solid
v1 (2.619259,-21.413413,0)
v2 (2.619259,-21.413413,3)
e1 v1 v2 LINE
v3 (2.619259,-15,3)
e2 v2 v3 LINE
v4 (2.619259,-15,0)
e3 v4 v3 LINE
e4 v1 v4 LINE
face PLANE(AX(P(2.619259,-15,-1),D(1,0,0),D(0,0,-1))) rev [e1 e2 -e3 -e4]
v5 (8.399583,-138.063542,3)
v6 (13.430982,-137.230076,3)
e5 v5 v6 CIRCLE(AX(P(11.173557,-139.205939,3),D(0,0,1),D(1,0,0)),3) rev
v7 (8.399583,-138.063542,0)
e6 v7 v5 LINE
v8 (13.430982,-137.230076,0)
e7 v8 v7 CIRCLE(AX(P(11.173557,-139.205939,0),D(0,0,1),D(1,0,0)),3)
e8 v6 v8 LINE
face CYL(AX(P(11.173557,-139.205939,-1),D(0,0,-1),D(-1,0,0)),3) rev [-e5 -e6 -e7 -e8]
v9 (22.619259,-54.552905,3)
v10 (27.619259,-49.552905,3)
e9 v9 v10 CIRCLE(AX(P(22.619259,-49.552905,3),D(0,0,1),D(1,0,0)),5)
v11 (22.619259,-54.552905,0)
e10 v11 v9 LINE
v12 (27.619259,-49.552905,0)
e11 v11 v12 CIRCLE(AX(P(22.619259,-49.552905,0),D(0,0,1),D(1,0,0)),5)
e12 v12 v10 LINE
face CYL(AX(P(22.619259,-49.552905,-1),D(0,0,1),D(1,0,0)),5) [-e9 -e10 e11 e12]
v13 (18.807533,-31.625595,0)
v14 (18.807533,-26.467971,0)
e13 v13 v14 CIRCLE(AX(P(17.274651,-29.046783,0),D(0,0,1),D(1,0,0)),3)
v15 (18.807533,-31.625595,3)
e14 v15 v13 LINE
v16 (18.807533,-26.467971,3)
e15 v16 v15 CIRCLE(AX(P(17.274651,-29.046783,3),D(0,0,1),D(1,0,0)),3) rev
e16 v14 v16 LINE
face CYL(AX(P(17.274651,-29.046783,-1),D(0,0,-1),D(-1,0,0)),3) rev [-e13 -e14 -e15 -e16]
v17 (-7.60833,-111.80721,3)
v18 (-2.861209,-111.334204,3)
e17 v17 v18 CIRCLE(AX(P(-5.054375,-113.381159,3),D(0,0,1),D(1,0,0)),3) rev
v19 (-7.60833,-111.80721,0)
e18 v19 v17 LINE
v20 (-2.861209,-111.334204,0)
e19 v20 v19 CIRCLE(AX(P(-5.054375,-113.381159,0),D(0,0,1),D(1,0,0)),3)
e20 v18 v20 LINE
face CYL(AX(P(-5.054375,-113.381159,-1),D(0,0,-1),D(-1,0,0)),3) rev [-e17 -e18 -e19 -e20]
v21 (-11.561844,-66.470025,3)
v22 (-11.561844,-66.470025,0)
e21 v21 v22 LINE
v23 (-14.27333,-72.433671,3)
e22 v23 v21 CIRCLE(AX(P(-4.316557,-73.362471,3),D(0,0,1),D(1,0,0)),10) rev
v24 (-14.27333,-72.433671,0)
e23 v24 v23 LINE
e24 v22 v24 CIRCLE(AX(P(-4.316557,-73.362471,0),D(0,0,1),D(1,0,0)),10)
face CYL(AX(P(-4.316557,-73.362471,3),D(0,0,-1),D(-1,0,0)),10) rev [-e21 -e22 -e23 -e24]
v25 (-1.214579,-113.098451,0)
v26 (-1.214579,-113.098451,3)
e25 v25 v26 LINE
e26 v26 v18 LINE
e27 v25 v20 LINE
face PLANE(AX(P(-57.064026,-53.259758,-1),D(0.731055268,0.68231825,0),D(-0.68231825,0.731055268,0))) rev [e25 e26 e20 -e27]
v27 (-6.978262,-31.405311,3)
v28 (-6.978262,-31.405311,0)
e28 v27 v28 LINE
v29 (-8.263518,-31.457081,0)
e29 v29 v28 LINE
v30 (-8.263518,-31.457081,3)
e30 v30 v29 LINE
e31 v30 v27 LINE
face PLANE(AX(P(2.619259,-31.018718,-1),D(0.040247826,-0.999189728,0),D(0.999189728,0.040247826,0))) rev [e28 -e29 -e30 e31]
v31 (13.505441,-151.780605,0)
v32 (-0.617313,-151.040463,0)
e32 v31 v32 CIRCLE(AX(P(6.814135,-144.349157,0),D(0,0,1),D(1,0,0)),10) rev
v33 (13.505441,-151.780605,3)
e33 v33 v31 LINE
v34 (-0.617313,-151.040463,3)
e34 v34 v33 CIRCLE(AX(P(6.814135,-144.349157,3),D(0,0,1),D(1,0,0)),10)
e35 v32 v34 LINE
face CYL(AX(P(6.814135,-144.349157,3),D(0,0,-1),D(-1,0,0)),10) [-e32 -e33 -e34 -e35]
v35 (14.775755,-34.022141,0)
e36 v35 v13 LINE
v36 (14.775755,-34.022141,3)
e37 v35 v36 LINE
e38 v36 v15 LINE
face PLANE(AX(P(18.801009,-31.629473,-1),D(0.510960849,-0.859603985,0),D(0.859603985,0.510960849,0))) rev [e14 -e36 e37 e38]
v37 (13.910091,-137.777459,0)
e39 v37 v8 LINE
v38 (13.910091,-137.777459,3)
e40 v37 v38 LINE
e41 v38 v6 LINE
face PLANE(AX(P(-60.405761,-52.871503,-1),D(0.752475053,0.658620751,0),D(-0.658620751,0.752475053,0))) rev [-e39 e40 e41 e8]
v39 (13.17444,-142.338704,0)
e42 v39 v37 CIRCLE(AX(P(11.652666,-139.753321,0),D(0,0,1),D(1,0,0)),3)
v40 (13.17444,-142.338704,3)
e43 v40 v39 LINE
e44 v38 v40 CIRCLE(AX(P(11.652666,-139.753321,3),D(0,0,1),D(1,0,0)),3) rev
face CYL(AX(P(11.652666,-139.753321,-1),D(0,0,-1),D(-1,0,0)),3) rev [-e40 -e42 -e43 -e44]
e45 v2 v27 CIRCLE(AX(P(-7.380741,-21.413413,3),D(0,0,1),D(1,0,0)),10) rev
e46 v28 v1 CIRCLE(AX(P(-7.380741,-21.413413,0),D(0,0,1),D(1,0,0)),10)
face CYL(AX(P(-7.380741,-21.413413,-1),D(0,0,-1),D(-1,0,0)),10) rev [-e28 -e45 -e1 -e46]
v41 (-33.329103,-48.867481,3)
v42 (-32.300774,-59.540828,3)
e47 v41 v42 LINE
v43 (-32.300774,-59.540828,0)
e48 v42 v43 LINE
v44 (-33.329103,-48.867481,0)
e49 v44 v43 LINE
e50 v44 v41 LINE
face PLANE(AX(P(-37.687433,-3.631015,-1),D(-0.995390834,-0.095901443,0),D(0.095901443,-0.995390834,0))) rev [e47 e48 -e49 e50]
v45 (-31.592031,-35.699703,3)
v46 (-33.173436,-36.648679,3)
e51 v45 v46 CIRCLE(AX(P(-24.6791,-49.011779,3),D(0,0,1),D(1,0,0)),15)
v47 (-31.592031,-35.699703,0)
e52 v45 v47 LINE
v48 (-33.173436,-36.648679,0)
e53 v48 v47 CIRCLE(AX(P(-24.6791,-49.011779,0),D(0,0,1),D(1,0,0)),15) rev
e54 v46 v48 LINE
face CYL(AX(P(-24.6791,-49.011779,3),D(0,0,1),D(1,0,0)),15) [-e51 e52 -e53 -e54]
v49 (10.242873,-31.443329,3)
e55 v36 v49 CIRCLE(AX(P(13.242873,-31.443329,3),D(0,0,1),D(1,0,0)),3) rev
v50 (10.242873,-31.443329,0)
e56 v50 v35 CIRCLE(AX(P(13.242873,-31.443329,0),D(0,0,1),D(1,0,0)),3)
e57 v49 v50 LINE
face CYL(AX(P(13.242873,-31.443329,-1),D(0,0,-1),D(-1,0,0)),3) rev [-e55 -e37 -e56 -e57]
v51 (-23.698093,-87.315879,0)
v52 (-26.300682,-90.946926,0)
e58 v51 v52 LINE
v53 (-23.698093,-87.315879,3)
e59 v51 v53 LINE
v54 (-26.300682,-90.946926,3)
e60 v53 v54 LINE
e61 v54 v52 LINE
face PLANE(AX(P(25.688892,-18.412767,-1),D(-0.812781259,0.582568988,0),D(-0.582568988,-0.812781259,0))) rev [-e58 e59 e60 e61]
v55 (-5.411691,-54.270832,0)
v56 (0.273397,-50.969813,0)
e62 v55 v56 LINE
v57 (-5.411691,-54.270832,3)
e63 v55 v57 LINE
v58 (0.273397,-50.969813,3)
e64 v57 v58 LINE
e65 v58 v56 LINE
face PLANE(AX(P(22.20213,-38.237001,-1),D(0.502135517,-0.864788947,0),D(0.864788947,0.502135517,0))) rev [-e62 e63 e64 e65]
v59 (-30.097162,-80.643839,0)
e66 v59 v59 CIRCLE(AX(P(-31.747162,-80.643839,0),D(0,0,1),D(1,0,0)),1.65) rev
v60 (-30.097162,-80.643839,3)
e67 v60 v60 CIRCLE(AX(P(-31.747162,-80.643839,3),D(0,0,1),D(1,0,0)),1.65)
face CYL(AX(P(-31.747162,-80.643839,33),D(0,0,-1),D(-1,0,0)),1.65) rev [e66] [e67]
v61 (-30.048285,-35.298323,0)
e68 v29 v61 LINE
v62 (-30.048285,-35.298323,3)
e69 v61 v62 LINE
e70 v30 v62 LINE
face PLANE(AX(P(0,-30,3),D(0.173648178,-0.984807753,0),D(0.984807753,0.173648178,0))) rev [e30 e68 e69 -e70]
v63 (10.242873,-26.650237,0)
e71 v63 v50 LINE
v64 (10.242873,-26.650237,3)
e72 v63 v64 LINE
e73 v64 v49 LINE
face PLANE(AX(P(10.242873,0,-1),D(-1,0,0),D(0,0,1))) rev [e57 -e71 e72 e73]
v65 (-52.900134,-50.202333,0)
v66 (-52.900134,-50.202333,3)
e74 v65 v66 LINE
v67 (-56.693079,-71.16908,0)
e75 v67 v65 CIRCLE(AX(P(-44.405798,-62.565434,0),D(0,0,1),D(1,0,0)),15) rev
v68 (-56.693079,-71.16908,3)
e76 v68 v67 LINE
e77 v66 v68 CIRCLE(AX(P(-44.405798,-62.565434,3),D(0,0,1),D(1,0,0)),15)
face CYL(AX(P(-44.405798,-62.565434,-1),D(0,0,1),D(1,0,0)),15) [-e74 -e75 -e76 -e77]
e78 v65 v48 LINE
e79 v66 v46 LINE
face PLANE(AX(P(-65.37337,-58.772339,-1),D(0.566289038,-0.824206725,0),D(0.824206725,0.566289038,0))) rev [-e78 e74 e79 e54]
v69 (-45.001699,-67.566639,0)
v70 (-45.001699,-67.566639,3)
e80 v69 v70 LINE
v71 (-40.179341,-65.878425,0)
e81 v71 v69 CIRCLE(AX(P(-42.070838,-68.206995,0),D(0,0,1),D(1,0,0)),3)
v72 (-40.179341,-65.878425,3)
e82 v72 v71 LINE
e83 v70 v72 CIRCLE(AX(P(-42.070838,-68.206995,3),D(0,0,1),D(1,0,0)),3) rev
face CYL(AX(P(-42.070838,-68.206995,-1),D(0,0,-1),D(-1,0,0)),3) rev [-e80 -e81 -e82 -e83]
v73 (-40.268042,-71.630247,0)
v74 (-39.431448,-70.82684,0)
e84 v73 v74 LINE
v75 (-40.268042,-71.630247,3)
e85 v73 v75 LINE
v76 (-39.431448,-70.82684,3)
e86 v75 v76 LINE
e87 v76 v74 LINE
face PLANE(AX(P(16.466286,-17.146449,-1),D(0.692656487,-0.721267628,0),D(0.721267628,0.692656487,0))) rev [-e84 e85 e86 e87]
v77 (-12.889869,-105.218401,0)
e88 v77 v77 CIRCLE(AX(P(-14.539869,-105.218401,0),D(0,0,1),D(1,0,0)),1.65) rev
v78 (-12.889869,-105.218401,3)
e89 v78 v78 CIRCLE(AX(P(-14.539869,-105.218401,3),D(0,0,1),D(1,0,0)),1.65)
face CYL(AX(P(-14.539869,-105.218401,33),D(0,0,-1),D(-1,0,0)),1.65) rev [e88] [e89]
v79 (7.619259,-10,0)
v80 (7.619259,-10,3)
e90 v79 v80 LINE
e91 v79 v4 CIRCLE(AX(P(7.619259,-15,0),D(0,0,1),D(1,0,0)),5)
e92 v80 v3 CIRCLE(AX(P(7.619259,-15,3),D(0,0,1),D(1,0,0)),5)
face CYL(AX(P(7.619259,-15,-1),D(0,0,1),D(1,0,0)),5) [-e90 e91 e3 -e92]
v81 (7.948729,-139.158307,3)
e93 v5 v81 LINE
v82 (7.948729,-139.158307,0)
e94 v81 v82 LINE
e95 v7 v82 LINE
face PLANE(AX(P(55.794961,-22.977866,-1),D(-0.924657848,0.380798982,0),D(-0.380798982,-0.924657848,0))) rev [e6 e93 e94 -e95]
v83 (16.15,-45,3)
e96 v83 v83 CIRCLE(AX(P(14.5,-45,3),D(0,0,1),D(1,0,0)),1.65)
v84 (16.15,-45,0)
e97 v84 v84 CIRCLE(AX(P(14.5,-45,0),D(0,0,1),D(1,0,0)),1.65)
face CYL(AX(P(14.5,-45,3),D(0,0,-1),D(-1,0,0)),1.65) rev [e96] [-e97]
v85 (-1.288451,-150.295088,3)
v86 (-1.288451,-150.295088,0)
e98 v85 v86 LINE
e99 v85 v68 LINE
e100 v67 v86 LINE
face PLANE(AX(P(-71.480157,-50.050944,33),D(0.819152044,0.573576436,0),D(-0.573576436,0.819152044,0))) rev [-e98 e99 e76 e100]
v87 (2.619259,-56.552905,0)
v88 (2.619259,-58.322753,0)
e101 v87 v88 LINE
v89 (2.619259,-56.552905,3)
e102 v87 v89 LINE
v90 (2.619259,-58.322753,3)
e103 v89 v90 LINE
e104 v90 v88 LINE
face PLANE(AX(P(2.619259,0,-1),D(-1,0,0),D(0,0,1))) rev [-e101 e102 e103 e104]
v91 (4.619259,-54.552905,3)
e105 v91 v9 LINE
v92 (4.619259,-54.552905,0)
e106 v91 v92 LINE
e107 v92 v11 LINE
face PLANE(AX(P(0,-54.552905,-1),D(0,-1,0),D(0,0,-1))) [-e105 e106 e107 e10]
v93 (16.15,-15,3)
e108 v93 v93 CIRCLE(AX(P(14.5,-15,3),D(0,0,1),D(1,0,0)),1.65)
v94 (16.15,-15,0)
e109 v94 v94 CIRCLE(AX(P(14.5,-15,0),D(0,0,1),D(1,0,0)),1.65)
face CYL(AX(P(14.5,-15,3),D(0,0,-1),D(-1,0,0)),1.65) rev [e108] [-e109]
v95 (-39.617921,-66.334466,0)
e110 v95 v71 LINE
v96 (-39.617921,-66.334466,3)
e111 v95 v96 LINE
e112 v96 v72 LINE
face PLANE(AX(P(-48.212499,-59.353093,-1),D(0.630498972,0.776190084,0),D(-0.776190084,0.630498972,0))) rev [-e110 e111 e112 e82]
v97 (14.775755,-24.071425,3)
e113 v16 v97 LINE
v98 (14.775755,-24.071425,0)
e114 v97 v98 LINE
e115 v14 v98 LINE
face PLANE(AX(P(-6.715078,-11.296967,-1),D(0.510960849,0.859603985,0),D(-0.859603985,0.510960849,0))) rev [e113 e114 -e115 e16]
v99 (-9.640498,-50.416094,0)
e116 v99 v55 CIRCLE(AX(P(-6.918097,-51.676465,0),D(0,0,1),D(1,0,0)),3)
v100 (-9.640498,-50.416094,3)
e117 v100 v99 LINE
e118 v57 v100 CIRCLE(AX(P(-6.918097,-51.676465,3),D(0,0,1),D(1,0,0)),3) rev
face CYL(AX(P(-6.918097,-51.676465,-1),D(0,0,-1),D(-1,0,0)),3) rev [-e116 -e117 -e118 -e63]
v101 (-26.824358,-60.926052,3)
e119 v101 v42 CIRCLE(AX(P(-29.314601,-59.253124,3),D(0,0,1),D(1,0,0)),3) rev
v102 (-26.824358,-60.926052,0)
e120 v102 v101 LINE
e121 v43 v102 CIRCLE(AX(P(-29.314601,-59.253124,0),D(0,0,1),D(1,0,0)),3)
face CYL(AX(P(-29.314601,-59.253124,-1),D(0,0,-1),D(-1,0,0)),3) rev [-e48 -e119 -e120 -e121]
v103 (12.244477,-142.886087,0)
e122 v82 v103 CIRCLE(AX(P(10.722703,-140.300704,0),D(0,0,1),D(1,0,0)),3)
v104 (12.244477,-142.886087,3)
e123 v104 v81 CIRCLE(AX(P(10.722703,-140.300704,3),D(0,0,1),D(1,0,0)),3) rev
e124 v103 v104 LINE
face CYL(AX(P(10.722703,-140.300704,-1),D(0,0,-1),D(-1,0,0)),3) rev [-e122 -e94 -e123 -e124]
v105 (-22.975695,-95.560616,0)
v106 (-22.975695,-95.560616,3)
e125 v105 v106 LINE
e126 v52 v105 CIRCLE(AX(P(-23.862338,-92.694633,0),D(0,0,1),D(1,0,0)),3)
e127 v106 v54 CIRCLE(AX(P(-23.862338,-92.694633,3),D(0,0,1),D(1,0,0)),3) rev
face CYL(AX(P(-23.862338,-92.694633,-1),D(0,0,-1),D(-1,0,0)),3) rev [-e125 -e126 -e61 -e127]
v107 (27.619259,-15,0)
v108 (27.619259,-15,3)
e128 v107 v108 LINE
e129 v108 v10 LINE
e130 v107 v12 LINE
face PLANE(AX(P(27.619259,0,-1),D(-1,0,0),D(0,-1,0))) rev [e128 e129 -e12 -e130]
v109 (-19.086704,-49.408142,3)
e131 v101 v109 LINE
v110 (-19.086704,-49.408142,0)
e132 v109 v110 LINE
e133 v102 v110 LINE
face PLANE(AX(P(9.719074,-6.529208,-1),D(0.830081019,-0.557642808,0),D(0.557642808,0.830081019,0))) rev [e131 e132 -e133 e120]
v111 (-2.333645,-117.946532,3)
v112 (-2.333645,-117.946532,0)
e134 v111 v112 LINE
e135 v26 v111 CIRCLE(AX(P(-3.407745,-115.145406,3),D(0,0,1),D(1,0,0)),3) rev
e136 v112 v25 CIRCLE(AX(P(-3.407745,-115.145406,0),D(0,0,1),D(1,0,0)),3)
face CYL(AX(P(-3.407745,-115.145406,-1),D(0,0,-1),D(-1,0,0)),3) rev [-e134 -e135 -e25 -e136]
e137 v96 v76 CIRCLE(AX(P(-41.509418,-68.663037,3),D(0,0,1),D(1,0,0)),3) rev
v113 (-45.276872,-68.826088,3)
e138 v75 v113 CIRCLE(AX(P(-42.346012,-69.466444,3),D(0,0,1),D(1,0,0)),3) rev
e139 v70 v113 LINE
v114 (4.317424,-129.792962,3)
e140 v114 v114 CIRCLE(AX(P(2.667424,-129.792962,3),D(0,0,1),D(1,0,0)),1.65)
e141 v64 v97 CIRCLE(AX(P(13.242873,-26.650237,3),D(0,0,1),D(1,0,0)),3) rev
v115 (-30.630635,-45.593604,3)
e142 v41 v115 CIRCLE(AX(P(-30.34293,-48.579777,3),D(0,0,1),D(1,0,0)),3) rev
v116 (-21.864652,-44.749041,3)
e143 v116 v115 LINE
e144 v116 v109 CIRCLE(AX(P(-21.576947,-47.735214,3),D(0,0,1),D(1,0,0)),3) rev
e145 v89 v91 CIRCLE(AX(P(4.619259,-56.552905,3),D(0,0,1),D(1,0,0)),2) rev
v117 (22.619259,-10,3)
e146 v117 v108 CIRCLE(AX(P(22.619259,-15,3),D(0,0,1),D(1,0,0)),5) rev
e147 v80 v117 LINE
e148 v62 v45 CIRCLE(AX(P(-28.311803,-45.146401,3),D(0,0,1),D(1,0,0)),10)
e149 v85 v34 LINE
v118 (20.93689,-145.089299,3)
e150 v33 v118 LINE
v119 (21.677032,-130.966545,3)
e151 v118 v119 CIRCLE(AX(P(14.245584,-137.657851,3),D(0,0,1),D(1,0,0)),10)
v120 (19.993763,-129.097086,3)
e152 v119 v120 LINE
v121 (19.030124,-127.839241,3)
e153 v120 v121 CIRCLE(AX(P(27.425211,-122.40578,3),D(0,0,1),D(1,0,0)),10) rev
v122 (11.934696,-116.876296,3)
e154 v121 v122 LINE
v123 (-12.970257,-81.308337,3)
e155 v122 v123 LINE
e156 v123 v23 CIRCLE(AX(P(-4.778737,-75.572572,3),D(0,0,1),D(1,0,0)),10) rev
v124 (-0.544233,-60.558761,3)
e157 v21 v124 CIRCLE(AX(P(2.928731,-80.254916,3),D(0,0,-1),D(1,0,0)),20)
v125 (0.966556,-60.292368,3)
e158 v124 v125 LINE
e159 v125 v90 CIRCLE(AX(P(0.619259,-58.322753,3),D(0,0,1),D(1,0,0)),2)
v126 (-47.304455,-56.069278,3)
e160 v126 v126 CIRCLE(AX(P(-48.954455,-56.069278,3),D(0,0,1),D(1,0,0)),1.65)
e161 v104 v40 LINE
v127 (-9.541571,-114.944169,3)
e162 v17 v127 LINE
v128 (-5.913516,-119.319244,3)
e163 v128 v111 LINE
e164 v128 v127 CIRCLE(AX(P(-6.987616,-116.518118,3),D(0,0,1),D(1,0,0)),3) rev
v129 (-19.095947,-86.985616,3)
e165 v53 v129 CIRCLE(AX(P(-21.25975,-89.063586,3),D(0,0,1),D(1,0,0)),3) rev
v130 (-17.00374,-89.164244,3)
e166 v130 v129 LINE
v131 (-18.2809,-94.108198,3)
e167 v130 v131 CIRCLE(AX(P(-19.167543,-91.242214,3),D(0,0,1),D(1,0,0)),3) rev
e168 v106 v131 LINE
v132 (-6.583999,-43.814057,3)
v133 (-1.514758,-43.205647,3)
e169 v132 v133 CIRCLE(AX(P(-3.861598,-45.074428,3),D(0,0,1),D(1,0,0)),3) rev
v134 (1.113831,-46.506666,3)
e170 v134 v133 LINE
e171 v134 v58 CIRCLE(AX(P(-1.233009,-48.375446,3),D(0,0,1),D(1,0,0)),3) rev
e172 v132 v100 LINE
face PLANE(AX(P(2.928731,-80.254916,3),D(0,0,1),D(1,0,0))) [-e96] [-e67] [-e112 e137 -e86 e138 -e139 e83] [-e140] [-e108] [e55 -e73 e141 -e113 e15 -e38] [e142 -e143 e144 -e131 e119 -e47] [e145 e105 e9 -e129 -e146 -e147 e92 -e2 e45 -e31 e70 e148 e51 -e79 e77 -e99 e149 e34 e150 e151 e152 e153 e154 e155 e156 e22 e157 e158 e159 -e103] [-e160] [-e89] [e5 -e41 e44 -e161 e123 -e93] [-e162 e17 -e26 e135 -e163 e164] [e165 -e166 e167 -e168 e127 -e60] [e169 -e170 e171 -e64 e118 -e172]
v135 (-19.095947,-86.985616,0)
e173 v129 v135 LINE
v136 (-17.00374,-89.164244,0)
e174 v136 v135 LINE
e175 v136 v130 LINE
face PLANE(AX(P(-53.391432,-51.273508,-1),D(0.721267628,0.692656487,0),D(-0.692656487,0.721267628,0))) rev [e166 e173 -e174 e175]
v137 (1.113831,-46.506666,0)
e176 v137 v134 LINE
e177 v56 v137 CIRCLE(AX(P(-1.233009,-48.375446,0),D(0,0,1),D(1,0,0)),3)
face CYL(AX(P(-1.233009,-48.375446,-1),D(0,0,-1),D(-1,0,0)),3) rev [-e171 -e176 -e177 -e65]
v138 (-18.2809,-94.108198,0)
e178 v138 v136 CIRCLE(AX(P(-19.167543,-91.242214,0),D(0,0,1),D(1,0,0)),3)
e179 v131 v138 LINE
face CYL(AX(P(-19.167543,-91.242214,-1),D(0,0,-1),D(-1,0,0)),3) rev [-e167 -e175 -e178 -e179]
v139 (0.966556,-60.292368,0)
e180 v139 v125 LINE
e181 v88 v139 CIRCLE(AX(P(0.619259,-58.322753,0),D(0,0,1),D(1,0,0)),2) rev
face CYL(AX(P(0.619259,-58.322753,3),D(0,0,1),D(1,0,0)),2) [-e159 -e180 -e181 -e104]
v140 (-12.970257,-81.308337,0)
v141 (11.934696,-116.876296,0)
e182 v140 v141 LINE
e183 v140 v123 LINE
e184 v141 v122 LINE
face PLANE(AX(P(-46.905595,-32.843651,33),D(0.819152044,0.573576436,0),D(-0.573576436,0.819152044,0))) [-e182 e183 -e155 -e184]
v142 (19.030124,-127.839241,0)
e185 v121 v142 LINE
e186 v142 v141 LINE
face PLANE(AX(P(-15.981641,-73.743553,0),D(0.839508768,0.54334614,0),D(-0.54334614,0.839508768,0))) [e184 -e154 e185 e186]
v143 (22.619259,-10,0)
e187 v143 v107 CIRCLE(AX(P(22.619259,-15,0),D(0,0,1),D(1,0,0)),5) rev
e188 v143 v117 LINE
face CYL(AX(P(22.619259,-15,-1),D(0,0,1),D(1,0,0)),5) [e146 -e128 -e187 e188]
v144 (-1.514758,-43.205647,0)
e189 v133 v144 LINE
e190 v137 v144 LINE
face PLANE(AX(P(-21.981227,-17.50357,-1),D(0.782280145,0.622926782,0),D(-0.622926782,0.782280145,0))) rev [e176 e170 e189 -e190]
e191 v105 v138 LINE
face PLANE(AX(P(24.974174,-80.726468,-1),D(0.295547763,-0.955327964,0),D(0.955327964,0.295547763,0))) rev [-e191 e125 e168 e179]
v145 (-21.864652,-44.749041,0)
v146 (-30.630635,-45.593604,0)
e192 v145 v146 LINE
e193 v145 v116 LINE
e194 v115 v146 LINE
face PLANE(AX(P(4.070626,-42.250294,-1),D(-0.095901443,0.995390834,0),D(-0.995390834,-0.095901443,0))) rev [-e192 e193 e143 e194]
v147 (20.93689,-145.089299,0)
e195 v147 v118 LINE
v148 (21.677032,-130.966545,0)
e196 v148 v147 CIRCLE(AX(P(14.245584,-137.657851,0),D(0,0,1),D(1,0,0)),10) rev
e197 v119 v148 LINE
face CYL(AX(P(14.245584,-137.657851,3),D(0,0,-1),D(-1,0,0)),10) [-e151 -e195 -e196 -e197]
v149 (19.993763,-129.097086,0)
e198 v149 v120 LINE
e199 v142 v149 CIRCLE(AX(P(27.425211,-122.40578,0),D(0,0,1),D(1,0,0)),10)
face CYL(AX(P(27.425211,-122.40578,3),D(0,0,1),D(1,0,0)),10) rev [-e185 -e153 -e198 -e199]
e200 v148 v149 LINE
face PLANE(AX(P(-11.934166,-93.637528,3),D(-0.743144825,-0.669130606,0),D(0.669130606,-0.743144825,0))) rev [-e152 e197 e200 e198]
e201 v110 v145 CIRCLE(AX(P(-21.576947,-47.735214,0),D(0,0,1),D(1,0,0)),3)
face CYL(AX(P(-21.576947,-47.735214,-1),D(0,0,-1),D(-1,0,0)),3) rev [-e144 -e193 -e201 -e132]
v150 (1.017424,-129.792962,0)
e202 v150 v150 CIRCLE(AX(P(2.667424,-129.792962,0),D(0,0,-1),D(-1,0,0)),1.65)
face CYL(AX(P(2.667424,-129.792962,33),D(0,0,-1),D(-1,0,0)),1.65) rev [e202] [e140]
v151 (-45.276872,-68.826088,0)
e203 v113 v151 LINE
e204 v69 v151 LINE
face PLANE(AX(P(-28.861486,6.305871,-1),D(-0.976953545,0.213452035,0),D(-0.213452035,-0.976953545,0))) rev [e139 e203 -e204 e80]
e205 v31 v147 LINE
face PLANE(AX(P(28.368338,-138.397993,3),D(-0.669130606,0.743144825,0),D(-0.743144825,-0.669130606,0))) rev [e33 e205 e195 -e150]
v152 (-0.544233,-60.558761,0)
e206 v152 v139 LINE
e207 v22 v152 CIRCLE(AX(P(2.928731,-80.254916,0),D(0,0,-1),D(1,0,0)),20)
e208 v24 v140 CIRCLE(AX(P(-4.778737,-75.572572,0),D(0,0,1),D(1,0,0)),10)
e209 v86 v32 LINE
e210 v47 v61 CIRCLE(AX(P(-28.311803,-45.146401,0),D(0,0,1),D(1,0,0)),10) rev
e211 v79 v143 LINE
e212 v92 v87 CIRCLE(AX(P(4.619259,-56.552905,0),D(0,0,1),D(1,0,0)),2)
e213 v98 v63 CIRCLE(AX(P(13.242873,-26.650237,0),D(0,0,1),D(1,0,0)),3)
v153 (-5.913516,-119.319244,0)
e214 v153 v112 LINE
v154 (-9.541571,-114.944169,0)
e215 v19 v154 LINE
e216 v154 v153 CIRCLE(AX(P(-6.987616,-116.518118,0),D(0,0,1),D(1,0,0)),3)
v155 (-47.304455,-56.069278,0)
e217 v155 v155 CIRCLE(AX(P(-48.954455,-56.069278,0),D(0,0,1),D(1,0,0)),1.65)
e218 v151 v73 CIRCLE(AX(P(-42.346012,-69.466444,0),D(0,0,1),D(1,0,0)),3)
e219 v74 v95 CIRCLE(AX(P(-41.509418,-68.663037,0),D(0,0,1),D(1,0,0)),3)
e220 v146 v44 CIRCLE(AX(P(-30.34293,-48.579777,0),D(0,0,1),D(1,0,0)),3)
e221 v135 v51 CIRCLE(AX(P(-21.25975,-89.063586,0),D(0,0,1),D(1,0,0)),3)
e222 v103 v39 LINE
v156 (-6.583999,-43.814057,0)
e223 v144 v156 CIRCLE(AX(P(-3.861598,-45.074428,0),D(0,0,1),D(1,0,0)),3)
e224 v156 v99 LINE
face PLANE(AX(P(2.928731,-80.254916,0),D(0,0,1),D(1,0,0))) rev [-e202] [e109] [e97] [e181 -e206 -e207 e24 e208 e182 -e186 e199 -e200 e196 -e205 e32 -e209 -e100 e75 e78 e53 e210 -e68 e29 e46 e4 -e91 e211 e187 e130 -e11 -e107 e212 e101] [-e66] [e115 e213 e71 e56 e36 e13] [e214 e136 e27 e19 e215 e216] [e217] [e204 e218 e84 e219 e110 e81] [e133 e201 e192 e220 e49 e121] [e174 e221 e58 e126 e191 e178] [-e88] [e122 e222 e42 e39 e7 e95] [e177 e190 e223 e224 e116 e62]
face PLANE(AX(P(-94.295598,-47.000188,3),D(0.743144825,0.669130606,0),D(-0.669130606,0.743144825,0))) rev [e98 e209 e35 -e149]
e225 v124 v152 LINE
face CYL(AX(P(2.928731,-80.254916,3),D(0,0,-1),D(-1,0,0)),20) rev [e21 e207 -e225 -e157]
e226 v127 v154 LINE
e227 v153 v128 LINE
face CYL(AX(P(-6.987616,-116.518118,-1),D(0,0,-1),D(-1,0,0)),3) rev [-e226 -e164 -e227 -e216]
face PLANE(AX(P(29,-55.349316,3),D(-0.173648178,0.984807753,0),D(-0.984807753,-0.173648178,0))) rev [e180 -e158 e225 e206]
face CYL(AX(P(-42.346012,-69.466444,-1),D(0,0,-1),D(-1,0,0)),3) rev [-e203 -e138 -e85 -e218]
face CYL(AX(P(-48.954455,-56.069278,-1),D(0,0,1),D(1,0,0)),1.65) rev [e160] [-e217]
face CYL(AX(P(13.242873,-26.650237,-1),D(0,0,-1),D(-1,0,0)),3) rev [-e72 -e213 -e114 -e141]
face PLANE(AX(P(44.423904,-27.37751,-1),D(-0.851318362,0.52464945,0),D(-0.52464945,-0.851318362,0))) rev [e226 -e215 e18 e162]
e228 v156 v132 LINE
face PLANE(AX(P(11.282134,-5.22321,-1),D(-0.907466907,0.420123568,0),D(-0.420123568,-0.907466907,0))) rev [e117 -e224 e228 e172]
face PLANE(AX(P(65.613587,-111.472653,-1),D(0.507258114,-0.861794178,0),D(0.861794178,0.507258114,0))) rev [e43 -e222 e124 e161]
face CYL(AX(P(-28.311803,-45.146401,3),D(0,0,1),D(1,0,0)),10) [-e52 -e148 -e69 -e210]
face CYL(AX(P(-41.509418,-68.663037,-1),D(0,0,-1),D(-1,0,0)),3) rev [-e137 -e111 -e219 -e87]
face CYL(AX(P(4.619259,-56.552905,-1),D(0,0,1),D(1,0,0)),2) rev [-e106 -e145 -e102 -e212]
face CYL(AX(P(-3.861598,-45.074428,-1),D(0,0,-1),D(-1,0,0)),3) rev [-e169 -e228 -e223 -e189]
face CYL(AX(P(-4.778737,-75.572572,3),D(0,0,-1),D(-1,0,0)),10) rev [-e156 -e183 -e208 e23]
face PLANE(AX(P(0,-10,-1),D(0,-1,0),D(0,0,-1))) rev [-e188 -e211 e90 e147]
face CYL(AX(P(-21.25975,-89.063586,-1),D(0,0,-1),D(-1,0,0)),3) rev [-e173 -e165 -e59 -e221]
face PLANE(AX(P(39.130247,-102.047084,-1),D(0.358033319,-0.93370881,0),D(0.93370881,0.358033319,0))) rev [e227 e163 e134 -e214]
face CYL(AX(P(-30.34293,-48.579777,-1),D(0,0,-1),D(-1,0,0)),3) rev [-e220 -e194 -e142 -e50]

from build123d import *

# Parameters (mm, degrees)
SKETCH_1_R          = 1.65
EXTRUDE_1_DEPTH     = 3
CUT_EXTRUDE_1_DEPTH = 3
FILLET_1_R          = 10
EXTRUDE_2_DEPTH     = 3
FILLET_2_R          = 10
SKETCH_6_R          = 1.65
CUT_EXTRUDE_2_DEPTH = 33
FILLET_3_R          = 10
FILLET_4_R          = 10
EXTRUDE_3_DEPTH     = 3
SKETCH_8_R          = 1.65
CUT_EXTRUDE_3_DEPTH = 4
CUT_EXTRUDE_5_DEPTH = 4
FILLET_6_R          = 15
FILLET_7_R          = 15
CUT_EXTRUDE_6_DEPTH = 4
FILLET_8_R          = 3
CUT_EXTRUDE_7_DEPTH = 4
FILLET_11_R         = 2
FILLET_12_R         = 10
CUT_EXTRUDE_8_DEPTH = 4
FILLET_13_R         = 10


with BuildPart() as part:
    # 草图1 → 凸台-拉伸1 (new body)
    with BuildSketch(Plane.XY):
        with BuildLine():
            Line((0, -30), (-76.636599455, -43.513100194))
            Line((-76.636599455, -43.513100194), (-94.295597777, -47.000187555))
            Line((-94.295597777, -47.000187555), (6.073993177, -158.471911377))
            Line((6.073993177, -158.471911377), (28.368337941, -138.397993186))
            Line((28.368337941, -138.397993186), (-11.934165547, -93.637528433))
            ThreePointArc((-11.934165547, -93.637528433), (-15.981640549, -73.743553217), (-0.54423259, -60.558761246))
            Line((-0.54423259, -60.558761246), (29, -55.349315916))
            Line((29, -55.349315916), (29, -50))
            Line((29, -50), (29, 0))
            Line((29, 0), (0, 0))
            Line((0, 0), (0, -30))
        make_face()
        with Locations((14.5, -15)):
            Circle(SKETCH_1_R, mode=Mode.SUBTRACT)
        with Locations((14.5, -45)):
            Circle(SKETCH_1_R, mode=Mode.SUBTRACT)
    extrude(amount=EXTRUDE_1_DEPTH)

    # 草图2 → 切除-拉伸1 (cut)
    with BuildSketch(Plane.XY.offset(3)):
        Polygon((-37.509702142, -36.613972526), (-44.1108023, -102.736049466), (-92.232515274, -102.736049466), (-120.974922517, -15.648301308), align=None)
    extrude(amount=-CUT_EXTRUDE_1_DEPTH, mode=Mode.SUBTRACT)

    # 圆角1
    fillet_1_edges = [part.edges().sort_by_distance(p)[0] for p in [
        (0, 0, 1.5),
        (29, 0, 1.5),
        (29, -55.349315916, 1.5),
        (28.368337941, -138.397993186, 1.5),
        (6.073993177, -158.471911377, 1.5),
        (0, -30, 1.5),
        (-37.509702142, -36.613972526, 1.5),
        (-44.1108023, -102.736049466, 1.5),
    ]]
    fillet(fillet_1_edges, radius=FILLET_1_R)

    # 草图3 → 凸台-拉伸2 (add)
    with BuildSketch(Plane.XY.offset(3)):
        Polygon((-15.981640549, -73.743553217), (19.461958696, -128.506456934), (-25.512326967, -91.299735006), align=None)
    extrude(amount=-EXTRUDE_2_DEPTH)

    # 圆角2
    fillet_2_edges = [part.edges().sort_by_distance(p)[0] for p in [
        (-15.981640549, -73.743553217, 1.5),
        (19.461958696, -128.506456934, 1.5),
    ]]
    fillet(fillet_2_edges, radius=FILLET_2_R)

    # 草图6 → 切除-拉伸2 (cut)
    with BuildSketch(Plane.XY):
        Polygon((-87.672076615, -95.352784266), (10.45531874, -167.066930238), (-55.522232913, -72.841221354), align=None)
        Polygon((-17.568683959, -74.741102773), (35.029880069, -149.859637147), (-14.273329758, -72.43367092), align=None)
        with Locations((-31.747162049, -80.643839485)):
            Circle(SKETCH_6_R)
        with Locations((-14.539868958, -105.218400814)):
            Circle(SKETCH_6_R)
        with Locations(Location((2.667424132, -129.792962143, 0), (0, 0, 180))):
            Circle(SKETCH_6_R)
    extrude(amount=CUT_EXTRUDE_2_DEPTH, mode=Mode.SUBTRACT)

    # 圆角3
    # the kernel refuses this fillet: 10 mm, written as the material it adds along each edge
    with BuildSketch(Plane(origin=(-17.568683959, -74.741102773, 0), x_dir=(0.8191520442890025, 0.5735764363510307, 0), z_dir=(0, 0, 1))) as fillet_3_piece_1:
        with BuildLine():
            CenterArc((10, -8.017112469), FILLET_3_R, 126.706173487, 53.293826513)
            Line((0, -8.017112469), (-0.2, -8.017112469))
            Line((-0.2, -8.017112469), (-0.2, 0))
            Line((-0.2, 0), (0, 0.2))
            ThreePointArc((0, 0.2), (2.011442335, 0.2), (3.903342364, 0.160342249))
            Line((3.903342364, 0.160342249), (4.02288467, 0))
        make_face()
    extrude(amount=3)

    # 圆角4
    fillet_4_edges = [part.edges().sort_by_distance(p)[0] for p in [
        (-42.922716134, -90.835196128, 1.5),
    ]]
    fillet(fillet_4_edges, radius=FILLET_4_R)

    # 草图7 → 凸台-拉伸3 (add)
    with BuildSketch(Plane.XY.offset(3)):
        Polygon((-34.566125117, -102.769644932), (-65.373370144, -58.772339354), (-42.090796033, -16.519494834), (-31.58573936, -35.55781759), align=None)
    extrude(amount=-EXTRUDE_3_DEPTH)

    # 草图8 → 切除-拉伸3 (cut)
    with BuildSketch(Plane.XY.offset(3)):
        with Locations((-48.954455139, -56.069278157)):
            Circle(SKETCH_8_R)
    extrude(amount=-CUT_EXTRUDE_3_DEPTH, mode=Mode.SUBTRACT)

    # 草图9 → 切除-拉伸5 (cut)
    with BuildSketch(Plane.XY.offset(3)):
        Polygon((-31.58573936, -35.55781759), (-42.090796033, -16.519494834), (-65.373370144, -58.772339354), align=None)
    extrude(amount=-CUT_EXTRUDE_5_DEPTH, mode=Mode.SUBTRACT)

    # 圆角6
    fillet_6_edges = [part.edges().sort_by_distance(p)[0] for p in [
        (-65.373370144, -58.772339354, 1.5),
    ]]
    fillet(fillet_6_edges, radius=FILLET_6_R)

    # 圆角7
    # the kernel refuses this fillet: 15 mm, written as the material it takes off along each edge
    with BuildSketch(Plane(origin=(-31.58573936, -35.55781759, 7.815831315), x_dir=(-0.8242067246408917, -0.5662890384394996, 0), z_dir=(0, 0, -1))) as fillet_7_piece_1:
        with BuildLine():
            CenterArc((1.926332526, -15), FILLET_7_R, 90, 7.049103332)
            Line((0.085533646, -0.11337985), (0, 0))
            Line((0, 0), (1.926332526, 0))
        make_face()
    extrude(amount=12.63166263, mode=Mode.SUBTRACT)

    # 草图10 → 切除-拉伸6 (cut)
    with BuildSketch(Plane.XY.offset(3)):
        Polygon((-31.497161439, -67.881768792), (-15.547904948, -44.140451067), (-33.616807091, -45.881308748), align=None)
        Polygon((-13.635910341, -59.04618523), (3.278405873, -49.224969364), (-4.542191946, -39.403753498), align=None)
        Polygon((10.242872605, -36.716551154), (23.145942056, -29.046782931), (10.242872605, -21.377014708), align=None)
        Polygon((-47.382252639, -78.462252302), (-36.982602957, -68.475134443), (-43.961583104, -62.806110969), align=None)
        Polygon((-31.497161439, -98.196884234), (-13.635910341, -92.671187293), (-21.595666913, -84.382641882), align=None)
        Polygon((-14.194825195, -122.494735697), (1.82276298, -116.352745612), (-5.544832941, -108.458892839), align=None)
        Polygon((4.547829517, -147.416387444), (16.294826397, -140.502022472), (10.242872605, -133.5876575), align=None)
    extrude(amount=-CUT_EXTRUDE_6_DEPTH, mode=Mode.SUBTRACT)

    # 圆角8
    fillet_8_edges = [part.edges().sort_by_distance(p)[0] for p in [
        (16.294826397, -140.502022472, 1.5),
        (4.547829517, -147.416387444, 1.5),
        (10.242872605, -133.5876575, 1.5),
        (1.82276298, -116.352745612, 1.5),
        (-14.194825195, -122.494735697, 1.5),
        (-5.544832941, -108.458892839, 1.5),
        (-13.635910341, -92.671187293, 1.5),
        (-31.497161439, -98.196884234, 1.5),
        (-21.595666913, -84.382641882, 1.5),
        (-36.982602957, -68.475134443, 1.5),
        (-47.382252639, -78.462252302, 1.5),
        (-43.961583104, -62.806110969, 1.5),
        (23.145942056, -29.046782931, 1.5),
        (10.242872605, -36.716551154, 1.5),
        (10.242872605, -21.377014708, 1.5),
        (3.278405873, -49.224969364, 1.5),
        (-13.635910341, -59.04618523, 1.5),
        (-4.542191946, -39.403753498, 1.5),
        (-15.547904948, -44.140451067, 1.5),
        (-31.497161439, -67.881768792, 1.5),
        (-33.616807091, -45.881308748, 1.5),
    ]]
    fillet(fillet_8_edges, radius=FILLET_8_R)

    # 草图13 → 切除-拉伸7 (cut)
    with BuildSketch(Plane.XY.offset(3)):
        with BuildLine():
            ThreePointArc((2.619259417, -15), (4.083725511, -11.464466094), (7.619259417, -10))
            Line((7.619259417, -10), (22.619259417, -10))
            ThreePointArc((22.619259417, -10), (26.154793323, -11.464466094), (27.619259417, -15))
            Line((27.619259417, -15), (27.619259417, -49.552905051))
            ThreePointArc((27.619259417, -49.552905051), (26.154793323, -53.088438957), (22.619259417, -54.552905051))
            Line((22.619259417, -54.552905051), (2.619259417, -54.552905051))
            Line((2.619259417, -54.552905051), (2.619259417, -60.000952252))
            Line((2.619259417, -60.000952252), (20.736481777, -56.806397134))
            ThreePointArc((20.736481777, -56.806397134), (26.660444431, -53.386195701), (29, -46.958319604))
            Line((29, -46.958319604), (29, -10))
            ThreePointArc((29, -10), (26.071067812, -2.928932188), (19, 0))
            Line((19, 0), (10, 0))
            ThreePointArc((10, 0), (2.928932188, -2.928932188), (0, -10))
            Line((0, -10), (0, -15))
            Line((0, -15), (2.619259417, -15))
        make_face()
    extrude(amount=-CUT_EXTRUDE_7_DEPTH, mode=Mode.SUBTRACT)

    # 圆角11
    fillet_11_edges = [part.edges().sort_by_distance(p)[0] for p in [
        (2.619259417, -60.000952252, 1.5),
        (2.619259417, -54.552905051, 1.5),
    ]]
    fillet(fillet_11_edges, radius=FILLET_11_R)

    # 圆角12
    # the kernel refuses this fillet: 10 mm, written as the material it takes off along each edge
    with BuildSketch(Plane(origin=(0, -15, 19.695908746), x_dir=(1, 0, 0), z_dir=(0, 0, -1))) as fillet_12_piece_1:
        with BuildLine():
            CenterArc((9.999518916, 6.7477233), FILLET_12_R, 180.397405601, 42.039067217)
            Line((-0.000240542, 6.678363494), (-1.000216488, 6.671427514))
            ThreePointArc((-1.000216488, 6.671427514), (-1, 6.609003688), (-1, 0))
            Line((-1, 0), (0, -1))
            ThreePointArc((0, -1), (1.309629709, -1), (1.881233468, -0.67477233))
            Line((1.881233468, -0.67477233), (2.619259417, 0))
        make_face()
    extrude(amount=36.391817492, mode=Mode.SUBTRACT)

    # 草图14 → 切除-拉伸8 (cut)
    with BuildSketch(Plane.XY.offset(3)):
        Polygon((2.619259417, -15), (2.619259417, -31.018717886), (-8.263518223, -31.457081218), (-8.263518223, -7.080960467), align=None)
    extrude(amount=-CUT_EXTRUDE_8_DEPTH, mode=Mode.SUBTRACT)

    # 圆角13
    fillet_13_edges = [part.edges().sort_by_distance(p)[0] for p in [
        (2.619259417, -31.018717886, 1.5),
    ]]
    fillet(fillet_13_edges, radius=FILLET_13_R)


solid = part.part
